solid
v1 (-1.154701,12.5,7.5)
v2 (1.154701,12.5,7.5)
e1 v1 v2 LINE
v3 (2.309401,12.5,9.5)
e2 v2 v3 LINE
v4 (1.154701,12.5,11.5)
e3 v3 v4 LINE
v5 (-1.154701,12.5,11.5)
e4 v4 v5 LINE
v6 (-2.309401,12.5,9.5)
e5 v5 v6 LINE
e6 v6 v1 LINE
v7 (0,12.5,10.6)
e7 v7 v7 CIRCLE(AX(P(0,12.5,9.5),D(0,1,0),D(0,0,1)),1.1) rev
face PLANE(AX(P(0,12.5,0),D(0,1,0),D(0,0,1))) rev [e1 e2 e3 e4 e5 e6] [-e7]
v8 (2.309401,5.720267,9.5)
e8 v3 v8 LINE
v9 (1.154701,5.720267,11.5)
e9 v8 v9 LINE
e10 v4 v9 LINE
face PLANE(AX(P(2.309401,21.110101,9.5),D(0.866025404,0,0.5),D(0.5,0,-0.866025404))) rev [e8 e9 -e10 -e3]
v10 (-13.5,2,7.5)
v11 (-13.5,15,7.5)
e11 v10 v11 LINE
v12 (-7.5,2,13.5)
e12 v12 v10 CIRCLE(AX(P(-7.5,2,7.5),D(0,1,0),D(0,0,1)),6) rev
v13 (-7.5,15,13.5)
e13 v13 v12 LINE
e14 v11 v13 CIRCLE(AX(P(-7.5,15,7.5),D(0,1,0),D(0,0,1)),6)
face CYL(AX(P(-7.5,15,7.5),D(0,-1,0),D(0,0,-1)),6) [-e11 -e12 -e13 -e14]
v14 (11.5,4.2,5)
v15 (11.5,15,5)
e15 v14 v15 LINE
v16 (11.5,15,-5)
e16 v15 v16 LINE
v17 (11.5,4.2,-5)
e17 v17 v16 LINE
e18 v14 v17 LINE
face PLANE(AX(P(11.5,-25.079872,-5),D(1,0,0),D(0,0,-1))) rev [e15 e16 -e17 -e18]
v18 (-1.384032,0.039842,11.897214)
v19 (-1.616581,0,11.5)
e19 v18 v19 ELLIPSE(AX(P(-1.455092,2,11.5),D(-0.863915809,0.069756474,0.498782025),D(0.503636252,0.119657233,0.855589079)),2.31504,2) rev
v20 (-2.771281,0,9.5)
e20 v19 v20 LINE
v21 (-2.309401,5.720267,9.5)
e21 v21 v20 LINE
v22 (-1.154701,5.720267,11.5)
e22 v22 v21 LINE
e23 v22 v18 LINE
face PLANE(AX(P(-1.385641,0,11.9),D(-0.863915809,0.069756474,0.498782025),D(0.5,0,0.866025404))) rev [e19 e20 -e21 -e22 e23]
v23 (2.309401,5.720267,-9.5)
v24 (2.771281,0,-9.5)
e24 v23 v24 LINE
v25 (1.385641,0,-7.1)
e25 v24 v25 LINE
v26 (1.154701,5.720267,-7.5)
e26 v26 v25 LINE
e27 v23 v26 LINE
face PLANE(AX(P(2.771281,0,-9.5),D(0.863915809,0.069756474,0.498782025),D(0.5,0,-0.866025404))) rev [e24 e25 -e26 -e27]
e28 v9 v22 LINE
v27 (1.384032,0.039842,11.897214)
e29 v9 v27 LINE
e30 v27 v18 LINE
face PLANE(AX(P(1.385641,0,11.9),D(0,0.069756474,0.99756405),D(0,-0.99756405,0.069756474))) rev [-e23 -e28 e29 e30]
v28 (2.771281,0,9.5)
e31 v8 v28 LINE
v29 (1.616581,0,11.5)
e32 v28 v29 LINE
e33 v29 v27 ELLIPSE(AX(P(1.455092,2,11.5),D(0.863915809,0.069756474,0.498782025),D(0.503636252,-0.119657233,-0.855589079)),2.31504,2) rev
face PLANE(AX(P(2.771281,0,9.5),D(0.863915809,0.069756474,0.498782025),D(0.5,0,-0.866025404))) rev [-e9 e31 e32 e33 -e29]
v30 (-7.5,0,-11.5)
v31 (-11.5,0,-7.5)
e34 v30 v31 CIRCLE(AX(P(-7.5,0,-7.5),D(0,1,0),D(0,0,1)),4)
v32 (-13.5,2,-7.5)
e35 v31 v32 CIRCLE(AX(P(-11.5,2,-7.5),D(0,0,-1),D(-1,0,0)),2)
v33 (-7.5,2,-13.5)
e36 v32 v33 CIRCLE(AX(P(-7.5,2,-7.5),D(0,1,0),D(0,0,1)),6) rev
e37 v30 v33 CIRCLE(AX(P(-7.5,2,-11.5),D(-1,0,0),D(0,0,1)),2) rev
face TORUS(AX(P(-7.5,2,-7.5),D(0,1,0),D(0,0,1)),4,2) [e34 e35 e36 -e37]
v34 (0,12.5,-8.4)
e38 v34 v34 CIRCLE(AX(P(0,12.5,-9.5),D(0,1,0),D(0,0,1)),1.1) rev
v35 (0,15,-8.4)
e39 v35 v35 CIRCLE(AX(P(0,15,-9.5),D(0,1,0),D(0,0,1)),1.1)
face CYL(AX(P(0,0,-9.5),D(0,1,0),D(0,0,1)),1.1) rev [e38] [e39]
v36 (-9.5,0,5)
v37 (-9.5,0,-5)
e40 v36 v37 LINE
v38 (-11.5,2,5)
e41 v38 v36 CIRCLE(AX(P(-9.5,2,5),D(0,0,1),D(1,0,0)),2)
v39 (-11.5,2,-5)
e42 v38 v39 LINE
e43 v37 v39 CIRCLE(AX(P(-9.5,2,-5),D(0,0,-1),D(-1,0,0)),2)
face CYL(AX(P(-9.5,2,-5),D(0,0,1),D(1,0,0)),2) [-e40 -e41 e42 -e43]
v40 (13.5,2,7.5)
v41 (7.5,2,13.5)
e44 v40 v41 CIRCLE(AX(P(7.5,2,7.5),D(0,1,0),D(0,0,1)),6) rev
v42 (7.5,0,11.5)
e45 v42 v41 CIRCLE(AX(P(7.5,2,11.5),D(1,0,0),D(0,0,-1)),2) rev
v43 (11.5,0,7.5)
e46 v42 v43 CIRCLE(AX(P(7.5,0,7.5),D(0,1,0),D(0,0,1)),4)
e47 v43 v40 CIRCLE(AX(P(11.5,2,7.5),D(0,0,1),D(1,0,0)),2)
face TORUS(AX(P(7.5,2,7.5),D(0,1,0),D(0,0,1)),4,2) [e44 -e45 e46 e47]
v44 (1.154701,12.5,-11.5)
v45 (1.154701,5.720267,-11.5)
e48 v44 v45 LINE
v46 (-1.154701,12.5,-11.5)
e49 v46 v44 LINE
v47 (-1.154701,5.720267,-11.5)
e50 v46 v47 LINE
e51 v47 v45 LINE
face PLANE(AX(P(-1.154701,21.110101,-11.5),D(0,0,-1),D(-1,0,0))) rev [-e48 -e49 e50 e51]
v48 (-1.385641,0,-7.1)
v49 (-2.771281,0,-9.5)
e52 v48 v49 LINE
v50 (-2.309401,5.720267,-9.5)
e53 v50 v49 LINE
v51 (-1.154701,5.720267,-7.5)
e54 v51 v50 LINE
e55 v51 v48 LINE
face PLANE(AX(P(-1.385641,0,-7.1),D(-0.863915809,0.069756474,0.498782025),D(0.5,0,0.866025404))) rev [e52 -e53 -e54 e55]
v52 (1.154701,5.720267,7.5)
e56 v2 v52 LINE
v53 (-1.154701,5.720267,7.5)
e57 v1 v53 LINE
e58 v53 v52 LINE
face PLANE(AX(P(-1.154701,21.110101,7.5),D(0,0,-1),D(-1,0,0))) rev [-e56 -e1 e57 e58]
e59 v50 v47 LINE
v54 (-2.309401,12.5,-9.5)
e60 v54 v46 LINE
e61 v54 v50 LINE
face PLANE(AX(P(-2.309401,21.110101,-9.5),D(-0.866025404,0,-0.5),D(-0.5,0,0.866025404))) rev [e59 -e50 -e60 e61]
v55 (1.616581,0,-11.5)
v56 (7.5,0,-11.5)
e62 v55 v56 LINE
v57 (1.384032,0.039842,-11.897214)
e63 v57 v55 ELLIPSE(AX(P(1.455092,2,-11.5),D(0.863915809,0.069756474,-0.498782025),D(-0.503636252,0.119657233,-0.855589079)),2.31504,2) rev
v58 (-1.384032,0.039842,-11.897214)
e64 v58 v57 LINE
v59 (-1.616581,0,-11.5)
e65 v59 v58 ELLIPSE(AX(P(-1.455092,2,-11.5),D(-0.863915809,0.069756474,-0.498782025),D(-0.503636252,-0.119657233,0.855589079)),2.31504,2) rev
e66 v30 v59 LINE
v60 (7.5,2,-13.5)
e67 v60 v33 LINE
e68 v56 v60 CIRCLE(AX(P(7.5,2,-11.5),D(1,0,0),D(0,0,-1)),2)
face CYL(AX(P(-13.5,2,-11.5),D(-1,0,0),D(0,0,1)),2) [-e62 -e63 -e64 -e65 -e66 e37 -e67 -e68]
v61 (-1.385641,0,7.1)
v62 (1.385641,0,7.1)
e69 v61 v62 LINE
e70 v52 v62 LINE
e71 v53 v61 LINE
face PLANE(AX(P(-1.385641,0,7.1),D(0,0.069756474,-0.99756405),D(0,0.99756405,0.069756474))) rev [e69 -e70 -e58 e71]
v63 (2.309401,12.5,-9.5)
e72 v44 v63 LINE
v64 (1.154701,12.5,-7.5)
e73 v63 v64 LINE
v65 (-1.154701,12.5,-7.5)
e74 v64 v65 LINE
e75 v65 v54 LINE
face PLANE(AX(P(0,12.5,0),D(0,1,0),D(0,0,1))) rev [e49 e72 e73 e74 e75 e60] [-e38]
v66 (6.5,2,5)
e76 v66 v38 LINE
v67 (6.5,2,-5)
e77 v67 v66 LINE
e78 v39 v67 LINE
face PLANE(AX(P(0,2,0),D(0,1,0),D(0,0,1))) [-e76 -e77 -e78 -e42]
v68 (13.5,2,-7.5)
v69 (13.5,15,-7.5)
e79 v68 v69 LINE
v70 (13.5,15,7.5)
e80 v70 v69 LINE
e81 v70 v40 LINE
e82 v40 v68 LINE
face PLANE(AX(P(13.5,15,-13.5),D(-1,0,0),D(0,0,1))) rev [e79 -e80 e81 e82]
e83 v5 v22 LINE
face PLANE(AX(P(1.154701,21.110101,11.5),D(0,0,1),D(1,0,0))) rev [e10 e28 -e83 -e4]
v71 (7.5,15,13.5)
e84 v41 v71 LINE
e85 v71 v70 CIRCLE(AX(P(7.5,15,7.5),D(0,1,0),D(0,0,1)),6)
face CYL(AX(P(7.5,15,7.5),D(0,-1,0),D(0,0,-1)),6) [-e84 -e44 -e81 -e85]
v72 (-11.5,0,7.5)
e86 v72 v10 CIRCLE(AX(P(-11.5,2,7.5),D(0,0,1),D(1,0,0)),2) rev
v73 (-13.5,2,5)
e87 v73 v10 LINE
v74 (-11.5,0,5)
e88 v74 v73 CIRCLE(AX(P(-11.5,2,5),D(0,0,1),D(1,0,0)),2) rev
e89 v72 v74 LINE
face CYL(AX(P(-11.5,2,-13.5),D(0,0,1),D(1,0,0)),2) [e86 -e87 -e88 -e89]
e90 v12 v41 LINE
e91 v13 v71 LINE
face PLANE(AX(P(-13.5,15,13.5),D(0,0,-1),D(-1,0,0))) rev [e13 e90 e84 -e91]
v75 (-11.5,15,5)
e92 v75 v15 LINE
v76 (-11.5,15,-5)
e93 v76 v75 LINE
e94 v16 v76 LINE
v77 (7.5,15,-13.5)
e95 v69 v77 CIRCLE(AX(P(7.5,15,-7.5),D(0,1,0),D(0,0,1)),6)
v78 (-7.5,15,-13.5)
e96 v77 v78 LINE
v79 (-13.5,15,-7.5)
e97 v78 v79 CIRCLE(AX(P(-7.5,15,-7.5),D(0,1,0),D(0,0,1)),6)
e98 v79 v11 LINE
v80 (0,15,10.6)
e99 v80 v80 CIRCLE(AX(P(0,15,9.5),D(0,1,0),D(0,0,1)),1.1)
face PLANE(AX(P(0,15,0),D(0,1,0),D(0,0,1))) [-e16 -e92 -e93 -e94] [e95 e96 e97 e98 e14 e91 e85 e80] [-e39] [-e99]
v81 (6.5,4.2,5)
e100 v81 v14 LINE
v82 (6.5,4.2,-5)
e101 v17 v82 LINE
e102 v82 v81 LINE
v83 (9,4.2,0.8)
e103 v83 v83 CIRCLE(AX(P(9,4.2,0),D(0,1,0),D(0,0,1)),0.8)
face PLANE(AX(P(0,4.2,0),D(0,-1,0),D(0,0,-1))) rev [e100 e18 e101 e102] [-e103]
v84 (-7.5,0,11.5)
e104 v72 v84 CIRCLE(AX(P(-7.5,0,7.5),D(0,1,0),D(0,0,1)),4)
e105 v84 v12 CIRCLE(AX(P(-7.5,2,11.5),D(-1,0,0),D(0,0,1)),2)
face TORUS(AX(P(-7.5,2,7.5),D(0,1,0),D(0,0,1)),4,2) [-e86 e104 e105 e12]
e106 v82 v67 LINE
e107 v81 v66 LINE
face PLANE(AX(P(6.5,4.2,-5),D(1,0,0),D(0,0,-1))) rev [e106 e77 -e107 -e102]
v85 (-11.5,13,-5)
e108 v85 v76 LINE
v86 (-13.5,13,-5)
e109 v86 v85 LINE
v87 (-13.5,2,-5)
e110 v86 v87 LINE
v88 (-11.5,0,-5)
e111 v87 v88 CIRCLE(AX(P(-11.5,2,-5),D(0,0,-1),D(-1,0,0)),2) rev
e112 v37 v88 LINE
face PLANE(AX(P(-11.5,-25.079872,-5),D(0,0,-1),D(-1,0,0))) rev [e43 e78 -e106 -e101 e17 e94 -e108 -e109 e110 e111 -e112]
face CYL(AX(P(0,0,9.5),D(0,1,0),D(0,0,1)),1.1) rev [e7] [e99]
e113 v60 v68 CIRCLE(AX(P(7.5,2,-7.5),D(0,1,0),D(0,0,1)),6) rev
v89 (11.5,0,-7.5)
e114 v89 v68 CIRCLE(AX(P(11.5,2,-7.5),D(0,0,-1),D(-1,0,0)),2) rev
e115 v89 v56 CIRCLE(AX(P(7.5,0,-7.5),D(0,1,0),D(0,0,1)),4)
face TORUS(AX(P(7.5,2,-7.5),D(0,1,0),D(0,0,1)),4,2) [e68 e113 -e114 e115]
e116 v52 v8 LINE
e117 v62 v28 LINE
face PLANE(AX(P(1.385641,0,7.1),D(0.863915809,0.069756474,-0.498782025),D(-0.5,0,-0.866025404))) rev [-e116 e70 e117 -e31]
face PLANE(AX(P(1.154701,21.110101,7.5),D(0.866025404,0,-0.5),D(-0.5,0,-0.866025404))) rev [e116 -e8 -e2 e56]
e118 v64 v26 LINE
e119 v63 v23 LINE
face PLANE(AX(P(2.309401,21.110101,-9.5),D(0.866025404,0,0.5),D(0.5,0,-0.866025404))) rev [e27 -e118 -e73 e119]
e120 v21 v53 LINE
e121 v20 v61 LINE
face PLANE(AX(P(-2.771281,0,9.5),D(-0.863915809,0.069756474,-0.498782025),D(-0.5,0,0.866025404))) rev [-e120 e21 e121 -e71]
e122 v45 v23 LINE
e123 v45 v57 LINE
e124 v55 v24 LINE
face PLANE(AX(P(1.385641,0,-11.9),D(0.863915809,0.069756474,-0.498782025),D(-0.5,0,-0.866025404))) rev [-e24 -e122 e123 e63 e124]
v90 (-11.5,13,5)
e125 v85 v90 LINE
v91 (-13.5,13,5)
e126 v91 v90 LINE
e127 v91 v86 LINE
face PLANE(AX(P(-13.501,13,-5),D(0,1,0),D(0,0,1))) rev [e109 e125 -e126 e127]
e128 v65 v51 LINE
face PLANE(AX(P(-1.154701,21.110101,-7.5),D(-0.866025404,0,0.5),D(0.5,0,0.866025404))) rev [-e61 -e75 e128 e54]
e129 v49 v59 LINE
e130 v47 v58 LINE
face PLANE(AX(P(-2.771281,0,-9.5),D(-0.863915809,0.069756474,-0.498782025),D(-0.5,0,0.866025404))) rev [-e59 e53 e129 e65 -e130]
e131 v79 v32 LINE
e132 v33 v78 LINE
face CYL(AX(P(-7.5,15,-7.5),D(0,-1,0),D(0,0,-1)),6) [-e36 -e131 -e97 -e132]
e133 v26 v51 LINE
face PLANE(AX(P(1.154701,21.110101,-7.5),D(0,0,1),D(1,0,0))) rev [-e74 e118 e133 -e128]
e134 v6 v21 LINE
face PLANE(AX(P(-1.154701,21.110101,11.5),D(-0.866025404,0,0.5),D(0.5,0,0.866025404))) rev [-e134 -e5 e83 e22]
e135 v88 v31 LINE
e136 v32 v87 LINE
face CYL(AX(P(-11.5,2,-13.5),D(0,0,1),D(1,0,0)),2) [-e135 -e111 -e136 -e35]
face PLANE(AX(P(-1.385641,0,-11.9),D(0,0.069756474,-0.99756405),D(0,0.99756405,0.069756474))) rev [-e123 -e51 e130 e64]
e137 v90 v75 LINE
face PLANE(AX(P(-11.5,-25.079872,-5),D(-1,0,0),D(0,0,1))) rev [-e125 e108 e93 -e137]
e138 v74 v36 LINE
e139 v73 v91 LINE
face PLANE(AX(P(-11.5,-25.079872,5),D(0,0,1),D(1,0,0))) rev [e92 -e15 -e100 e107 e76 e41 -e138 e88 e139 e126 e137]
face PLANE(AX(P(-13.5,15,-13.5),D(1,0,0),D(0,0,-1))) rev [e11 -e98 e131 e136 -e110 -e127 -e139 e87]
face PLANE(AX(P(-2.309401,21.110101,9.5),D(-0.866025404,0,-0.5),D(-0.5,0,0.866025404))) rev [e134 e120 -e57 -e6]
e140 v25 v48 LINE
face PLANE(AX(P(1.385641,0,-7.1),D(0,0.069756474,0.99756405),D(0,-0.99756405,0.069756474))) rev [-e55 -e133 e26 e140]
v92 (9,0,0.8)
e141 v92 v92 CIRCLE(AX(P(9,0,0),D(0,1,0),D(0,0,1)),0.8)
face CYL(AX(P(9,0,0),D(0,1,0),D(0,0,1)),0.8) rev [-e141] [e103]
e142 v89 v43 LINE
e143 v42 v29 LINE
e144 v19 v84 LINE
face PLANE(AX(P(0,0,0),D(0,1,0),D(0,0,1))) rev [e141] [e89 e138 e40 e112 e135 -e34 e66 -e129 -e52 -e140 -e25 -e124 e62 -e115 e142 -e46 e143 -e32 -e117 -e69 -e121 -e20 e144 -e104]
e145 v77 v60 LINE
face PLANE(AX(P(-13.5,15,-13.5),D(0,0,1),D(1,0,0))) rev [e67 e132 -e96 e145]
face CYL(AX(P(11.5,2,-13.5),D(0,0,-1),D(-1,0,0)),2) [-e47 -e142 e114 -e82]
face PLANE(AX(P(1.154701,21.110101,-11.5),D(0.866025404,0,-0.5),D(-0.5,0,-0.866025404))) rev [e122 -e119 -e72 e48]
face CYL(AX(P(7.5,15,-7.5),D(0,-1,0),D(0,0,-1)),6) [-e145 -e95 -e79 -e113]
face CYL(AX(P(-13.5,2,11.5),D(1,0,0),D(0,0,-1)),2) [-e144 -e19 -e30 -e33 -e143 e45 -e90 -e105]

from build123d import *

# Parameters (mm, degrees)
ESQUISSE1_W             = 27
ESQUISSE1_H             = 27
BOSS_EXTRU_1_DEPTH      = 15
ESQUISSE2_W             = 23
ESQUISSE2_H             = 10
ENL_V_MAT_EXTRU_1_DEPTH = 13
ESQUISSE3_W             = 5
ESQUISSE3_H             = 10
BOSS_EXTRU_2_DEPTH      = 2.2
ESQUISSE4_R             = 0.8
ENL_V_MAT_EXTRU_2_DEPTH = 22.934903693
ENL_V_MAT_EXTRU_3_REACH = 34.129
ESQUISSE5_W             = 10
ESQUISSE5_H             = 11
ENL_V_MAT_EXTRU_4_REACH = 25.098
ESQUISSE6_W             = 2
ESQUISSE6_H             = 10
ESQUISSE7_R             = 1.1
ENL_V_MAT_EXTRU_5_DEPTH = 25.279621084
ENL_V_MAT_EXTRU_6_DEPTH = 12.5
CONG_1_R                = 6
CONG_1_R_2              = 2


with BuildPart() as part:
    # Esquisse1 → Boss.-Extru.1 (new body)
    with BuildSketch(Plane(origin=(0, 0, 0), x_dir=(1, 0, 0), z_dir=(0, 1, 0))):
        Rectangle(ESQUISSE1_W, ESQUISSE1_H)
    extrude(amount=BOSS_EXTRU_1_DEPTH)

    # Esquisse2 → Enlèv. mat.-Extru.1 (cut)
    with BuildSketch(Plane(origin=(0, 15, 0), x_dir=(1, 0, 0), z_dir=(0, 1, 0))):
        Rectangle(ESQUISSE2_W, ESQUISSE2_H)
    extrude(amount=-ENL_V_MAT_EXTRU_1_DEPTH, mode=Mode.SUBTRACT)

    # Esquisse3 → Boss.-Extru.2 (add)
    with BuildSketch(Plane(origin=(0, 2, 0), x_dir=(1, 0, 0), z_dir=(0, 1, 0))):
        with Locations((9, 0)):
            Rectangle(ESQUISSE3_W, ESQUISSE3_H)
    extrude(amount=BOSS_EXTRU_2_DEPTH)

    # Esquisse4 → Enlèv. mat.-Extru.2 (cut, through all)
    with BuildSketch(Plane(origin=(0, 4.2, 0), x_dir=(1, 0, 0), z_dir=(0, 1, 0))):
        with Locations(Location((9, 0, 0), (0, 0, 270))):
            Circle(ESQUISSE4_R)
    extrude(amount=-ENL_V_MAT_EXTRU_2_DEPTH, mode=Mode.SUBTRACT)

    # Esquisse5 → Enlèv. mat.-Extru.3 (cut, up to next)
    with BuildSketch(Plane(origin=(-11.5, 0, 0), x_dir=(0, 0, -1), z_dir=(1, 0, 0)), mode=Mode.PRIVATE) as enl_v_mat_extru_3_sk1:
        with Locations((0, 7.5)):
            Rectangle(ESQUISSE5_W, ESQUISSE5_H)
    enl_v_mat_extru_3_tool1 = extrude(enl_v_mat_extru_3_sk1.sketch, amount=-ENL_V_MAT_EXTRU_3_REACH, mode=Mode.PRIVATE) & part.part
    add(enl_v_mat_extru_3_tool1.solids().sort_by_distance((-11.5, 7.5, 0))[0], mode=Mode.SUBTRACT)

    # Esquisse6 → Enlèv. mat.-Extru.4 (cut, up to next)
    with BuildSketch(Plane(origin=(0, 2, 0), x_dir=(1, 0, 0), z_dir=(0, 1, 0)), mode=Mode.PRIVATE) as enl_v_mat_extru_4_sk1:
        with Locations((-12.5, 0)):
            Rectangle(ESQUISSE6_W, ESQUISSE6_H)
    enl_v_mat_extru_4_tool1 = extrude(enl_v_mat_extru_4_sk1.sketch, amount=-ENL_V_MAT_EXTRU_4_REACH, mode=Mode.PRIVATE) & part.part
    add(enl_v_mat_extru_4_tool1.solids().sort_by_distance((-12.5, 2, 0))[0], mode=Mode.SUBTRACT)

    # Esquisse7 → Enlèv. mat.-Extru.5 (cut, through all)
    with BuildSketch(Plane(origin=(0, 15, 0), x_dir=(1, 0, 0), z_dir=(0, 1, 0))):
        with Locations(Location((0, -9.5, 0), (0, 0, 270))):
            Circle(ESQUISSE7_R)
        with Locations(Location((0, 9.5, 0), (0, 0, 270))):
            Circle(ESQUISSE7_R)
    extrude(amount=-ENL_V_MAT_EXTRU_5_DEPTH, mode=Mode.SUBTRACT)

    # Esquisse8 → Enlèv. mat.-Extru.6 (cut)
    with BuildSketch(Plane.XZ):
        Polygon((2.309401077, -9.5), (1.154700538, -7.5), (-1.154700538, -7.5), (-2.309401077, -9.5), (-1.154700538, -11.5), (1.154700538, -11.5), align=None)
        Polygon((2.309401077, 9.5), (1.154700538, 11.5), (-1.154700538, 11.5), (-2.309401077, 9.5), (-1.154700538, 7.5), (1.154700538, 7.5), align=None)
    extrude(amount=-ENL_V_MAT_EXTRU_6_DEPTH, mode=Mode.SUBTRACT)

    # Enlèv. mat.-Extru.7: read off the stored shape, not the designer's step
    # Enlèv. mat.-Extru.7: loft between two sections, ruled curve by curve
    enl_v_mat_extru_7_from = [
        Edge.make_line((2.771281292, 0, -9.5), (1.385640646, 0, -7.1)),
        Edge.make_line((1.385640646, 0, -7.1), (-1.385640646, 0, -7.1)),
        Edge.make_line((-1.385640646, 0, -7.1), (-2.771281292, 0, -9.5)),
        Edge.make_line((-2.771281292, 0, -9.5), (-1.385640646, 0, -11.9)),
        Edge.make_line((-1.385640646, 0, -11.9), (1.385640646, 0, -11.9)),
        Edge.make_line((1.385640646, 0, -11.9), (2.771281292, 0, -9.5)),
    ]
    enl_v_mat_extru_7_to = [
        Edge.make_line((2.309401077, 5.720266503, -9.5), (1.154700538, 5.720266503, -7.5)),
        Edge.make_line((1.154700538, 5.720266503, -7.5), (-1.154700538, 5.720266503, -7.5)),
        Edge.make_line((-1.154700538, 5.720266503, -7.5), (-2.309401077, 5.720266503, -9.5)),
        Edge.make_line((-2.309401077, 5.720266503, -9.5), (-1.154700538, 5.720266503, -11.5)),
        Edge.make_line((-1.154700538, 5.720266503, -11.5), (1.154700538, 5.720266503, -11.5)),
        Edge.make_line((1.154700538, 5.720266503, -11.5), (2.309401077, 5.720266503, -9.5)),
    ]
    enl_v_mat_extru_7 = Solid(Shell([*[Face.make_surface_from_curves(enl_v_mat_extru_7_from[k], enl_v_mat_extru_7_to[k]) for k in range(6)], Face(Wire(enl_v_mat_extru_7_from)), Face(Wire(enl_v_mat_extru_7_to))]))
    add(enl_v_mat_extru_7, mode=Mode.SUBTRACT)

    # Enl_v. mat.-Extru.7 2: loft between two sections, ruled curve by curve
    enl_v_mat_extru_7_2_from = [
        Edge.make_line((2.771281292, 0, 9.5), (1.385640646, 0, 11.9)),
        Edge.make_line((1.385640646, 0, 11.9), (-1.385640646, 0, 11.9)),
        Edge.make_line((-1.385640646, 0, 11.9), (-2.771281292, 0, 9.5)),
        Edge.make_line((-2.771281292, 0, 9.5), (-1.385640646, 0, 7.1)),
        Edge.make_line((-1.385640646, 0, 7.1), (1.385640646, 0, 7.1)),
        Edge.make_line((1.385640646, 0, 7.1), (2.771281292, 0, 9.5)),
    ]
    enl_v_mat_extru_7_2_to = [
        Edge.make_line((2.309401077, 5.720266503, 9.5), (1.154700538, 5.720266503, 11.5)),
        Edge.make_line((1.154700538, 5.720266503, 11.5), (-1.154700538, 5.720266503, 11.5)),
        Edge.make_line((-1.154700538, 5.720266503, 11.5), (-2.309401077, 5.720266503, 9.5)),
        Edge.make_line((-2.309401077, 5.720266503, 9.5), (-1.154700538, 5.720266503, 7.5)),
        Edge.make_line((-1.154700538, 5.720266503, 7.5), (1.154700538, 5.720266503, 7.5)),
        Edge.make_line((1.154700538, 5.720266503, 7.5), (2.309401077, 5.720266503, 9.5)),
    ]
    enl_v_mat_extru_7_2 = Solid(Shell([*[Face.make_surface_from_curves(enl_v_mat_extru_7_2_from[k], enl_v_mat_extru_7_2_to[k]) for k in range(6)], Face(Wire(enl_v_mat_extru_7_2_from)), Face(Wire(enl_v_mat_extru_7_2_to))]))
    add(enl_v_mat_extru_7_2, mode=Mode.SUBTRACT)

    # Congé1
    # the kernel refuses this fillet: 6, 2 mm, written as the material it takes off along each edge
    with BuildSketch(Plane(origin=(13.5, -15, -13.5), x_dir=(-1, 0, 0), z_dir=(0, 1, 0)), Plane(origin=(13.5, -15, 13.5), x_dir=(0, 0, -1), z_dir=(0, 1, 0))) as cong_1_piece_1:
        with BuildLine():
            CenterArc((CONG_1_R, CONG_1_R), CONG_1_R, 180, 90)
            Line((0, CONG_1_R), (0, 0))
            Line((0, 0), (CONG_1_R, 0))
        make_face()
    extrude(amount=45, mode=Mode.SUBTRACT)
    with BuildSketch(Plane(origin=(-13.5, -15, 13.5), x_dir=(0, 0, -1), z_dir=(0, 1, 0)), Plane(origin=(-13.5, -15, -13.5), x_dir=(1, 0, 0), z_dir=(0, 1, 0))) as cong_1_piece_2:
        with BuildLine():
            CenterArc((CONG_1_R, -CONG_1_R), CONG_1_R, 90, 90)
            Line((0, -CONG_1_R), (0, 0))
            Line((0, 0), (CONG_1_R, 0))
        make_face()
    extrude(amount=45, mode=Mode.SUBTRACT)
    with BuildSketch(Plane(origin=(-11.5, 0, -5), x_dir=(1, 0, 0), z_dir=(0, 0, 1))) as cong_1_piece_3:
        with BuildLine():
            CenterArc((CONG_1_R_2, CONG_1_R_2), CONG_1_R_2, 180, 90)
            Line((0, CONG_1_R_2), (0, 0))
            Line((0, 0), (CONG_1_R_2, 0))
        make_face()
    extrude(amount=10, mode=Mode.SUBTRACT)
    # the kernel refuses this fillet: 6, 2 mm, written as the material it takes off along each edge
    with BuildSketch(Plane(origin=(13.5, 0, -7.5), x_dir=(0, 1, 0), z_dir=(0, 0, 1)), Plane(origin=(-7.5, 0, -13.5), x_dir=(0, 1, 0), z_dir=(1, 0, 0)), Plane(origin=(7.5, 0, 13.5), x_dir=(0, 1, 0), z_dir=(-1, 0, 0))) as cong_1_2_piece_1:
        with BuildLine():
            CenterArc((CONG_1_R_2, CONG_1_R_2), CONG_1_R_2, 180, 90)
            Line((0, CONG_1_R_2), (0, 0))
            Line((0, 0), (CONG_1_R_2, 0))
        make_face()
    extrude(amount=15, mode=Mode.SUBTRACT)
    with BuildSketch(Plane(origin=(-13.5, 0, 0), x_dir=(0, 1, 0), z_dir=(0, 0, -1)), Plane(origin=(-13.5, 0, 7.5), x_dir=(0, 1, 0), z_dir=(0, 0, -1))) as cong_1_2_piece_2:
        with BuildLine():
            CenterArc((CONG_1_R_2, CONG_1_R_2), CONG_1_R_2, 180, 90)
            Line((0, CONG_1_R_2), (0, 0))
            Line((0, 0), (CONG_1_R_2, 0))
        make_face()
    extrude(amount=7.5, mode=Mode.SUBTRACT)
    with BuildSketch(Plane(origin=(-7.5, 0, 7.5), x_dir=(0, 0, 1), z_dir=(1, 0, 0))) as cong_1_2_piece_3:
        with BuildLine():
            CenterArc((6 - CONG_1_R_2, -CONG_1_R_2), CONG_1_R_2, 0, 90)
            Line((6 - CONG_1_R_2, 0), (6, 0))
            Line((6, 0), (6, -CONG_1_R_2))
        make_face()
    revolve(axis=Axis((-7.5, 0, 7.5), (0, -1, 0)), revolution_arc=90, mode=Mode.SUBTRACT)
    with BuildSketch(Plane(origin=(-7.5, 0, -7.5), x_dir=(-1, 0, 0), z_dir=(0, 0, 1))) as cong_1_2_piece_4:
        with BuildLine():
            CenterArc((6 - CONG_1_R_2, -CONG_1_R_2), CONG_1_R_2, 0, 90)
            Line((6 - CONG_1_R_2, 0), (6, 0))
            Line((6, 0), (6, -CONG_1_R_2))
        make_face()
    revolve(axis=Axis((-7.5, 0, -7.5), (0, -1, 0)), revolution_arc=90, mode=Mode.SUBTRACT)
    with BuildSketch(Plane(origin=(7.5, 0, 7.5), x_dir=(1, 0, 0), z_dir=(0, 0, -1))) as cong_1_2_piece_5:
        with BuildLine():
            CenterArc((6 - CONG_1_R_2, -CONG_1_R_2), CONG_1_R_2, 0, 90)
            Line((6 - CONG_1_R_2, 0), (6, 0))
            Line((6, 0), (6, -CONG_1_R_2))
        make_face()
    revolve(axis=Axis((7.5, 0, 7.5), (0, -1, 0)), revolution_arc=90, mode=Mode.SUBTRACT)
    with BuildSketch(Plane(origin=(7.5, 0, -7.5), x_dir=(0, 0, -1), z_dir=(-1, 0, 0))) as cong_1_2_piece_6:
        with BuildLine():
            CenterArc((6 - CONG_1_R_2, -CONG_1_R_2), CONG_1_R_2, 0, 90)
            Line((6 - CONG_1_R_2, 0), (6, 0))
            Line((6, 0), (6, -CONG_1_R_2))
        make_face()
    revolve(axis=Axis((7.5, 0, -7.5), (0, -1, 0)), revolution_arc=90, mode=Mode.SUBTRACT)


solid = part.part
